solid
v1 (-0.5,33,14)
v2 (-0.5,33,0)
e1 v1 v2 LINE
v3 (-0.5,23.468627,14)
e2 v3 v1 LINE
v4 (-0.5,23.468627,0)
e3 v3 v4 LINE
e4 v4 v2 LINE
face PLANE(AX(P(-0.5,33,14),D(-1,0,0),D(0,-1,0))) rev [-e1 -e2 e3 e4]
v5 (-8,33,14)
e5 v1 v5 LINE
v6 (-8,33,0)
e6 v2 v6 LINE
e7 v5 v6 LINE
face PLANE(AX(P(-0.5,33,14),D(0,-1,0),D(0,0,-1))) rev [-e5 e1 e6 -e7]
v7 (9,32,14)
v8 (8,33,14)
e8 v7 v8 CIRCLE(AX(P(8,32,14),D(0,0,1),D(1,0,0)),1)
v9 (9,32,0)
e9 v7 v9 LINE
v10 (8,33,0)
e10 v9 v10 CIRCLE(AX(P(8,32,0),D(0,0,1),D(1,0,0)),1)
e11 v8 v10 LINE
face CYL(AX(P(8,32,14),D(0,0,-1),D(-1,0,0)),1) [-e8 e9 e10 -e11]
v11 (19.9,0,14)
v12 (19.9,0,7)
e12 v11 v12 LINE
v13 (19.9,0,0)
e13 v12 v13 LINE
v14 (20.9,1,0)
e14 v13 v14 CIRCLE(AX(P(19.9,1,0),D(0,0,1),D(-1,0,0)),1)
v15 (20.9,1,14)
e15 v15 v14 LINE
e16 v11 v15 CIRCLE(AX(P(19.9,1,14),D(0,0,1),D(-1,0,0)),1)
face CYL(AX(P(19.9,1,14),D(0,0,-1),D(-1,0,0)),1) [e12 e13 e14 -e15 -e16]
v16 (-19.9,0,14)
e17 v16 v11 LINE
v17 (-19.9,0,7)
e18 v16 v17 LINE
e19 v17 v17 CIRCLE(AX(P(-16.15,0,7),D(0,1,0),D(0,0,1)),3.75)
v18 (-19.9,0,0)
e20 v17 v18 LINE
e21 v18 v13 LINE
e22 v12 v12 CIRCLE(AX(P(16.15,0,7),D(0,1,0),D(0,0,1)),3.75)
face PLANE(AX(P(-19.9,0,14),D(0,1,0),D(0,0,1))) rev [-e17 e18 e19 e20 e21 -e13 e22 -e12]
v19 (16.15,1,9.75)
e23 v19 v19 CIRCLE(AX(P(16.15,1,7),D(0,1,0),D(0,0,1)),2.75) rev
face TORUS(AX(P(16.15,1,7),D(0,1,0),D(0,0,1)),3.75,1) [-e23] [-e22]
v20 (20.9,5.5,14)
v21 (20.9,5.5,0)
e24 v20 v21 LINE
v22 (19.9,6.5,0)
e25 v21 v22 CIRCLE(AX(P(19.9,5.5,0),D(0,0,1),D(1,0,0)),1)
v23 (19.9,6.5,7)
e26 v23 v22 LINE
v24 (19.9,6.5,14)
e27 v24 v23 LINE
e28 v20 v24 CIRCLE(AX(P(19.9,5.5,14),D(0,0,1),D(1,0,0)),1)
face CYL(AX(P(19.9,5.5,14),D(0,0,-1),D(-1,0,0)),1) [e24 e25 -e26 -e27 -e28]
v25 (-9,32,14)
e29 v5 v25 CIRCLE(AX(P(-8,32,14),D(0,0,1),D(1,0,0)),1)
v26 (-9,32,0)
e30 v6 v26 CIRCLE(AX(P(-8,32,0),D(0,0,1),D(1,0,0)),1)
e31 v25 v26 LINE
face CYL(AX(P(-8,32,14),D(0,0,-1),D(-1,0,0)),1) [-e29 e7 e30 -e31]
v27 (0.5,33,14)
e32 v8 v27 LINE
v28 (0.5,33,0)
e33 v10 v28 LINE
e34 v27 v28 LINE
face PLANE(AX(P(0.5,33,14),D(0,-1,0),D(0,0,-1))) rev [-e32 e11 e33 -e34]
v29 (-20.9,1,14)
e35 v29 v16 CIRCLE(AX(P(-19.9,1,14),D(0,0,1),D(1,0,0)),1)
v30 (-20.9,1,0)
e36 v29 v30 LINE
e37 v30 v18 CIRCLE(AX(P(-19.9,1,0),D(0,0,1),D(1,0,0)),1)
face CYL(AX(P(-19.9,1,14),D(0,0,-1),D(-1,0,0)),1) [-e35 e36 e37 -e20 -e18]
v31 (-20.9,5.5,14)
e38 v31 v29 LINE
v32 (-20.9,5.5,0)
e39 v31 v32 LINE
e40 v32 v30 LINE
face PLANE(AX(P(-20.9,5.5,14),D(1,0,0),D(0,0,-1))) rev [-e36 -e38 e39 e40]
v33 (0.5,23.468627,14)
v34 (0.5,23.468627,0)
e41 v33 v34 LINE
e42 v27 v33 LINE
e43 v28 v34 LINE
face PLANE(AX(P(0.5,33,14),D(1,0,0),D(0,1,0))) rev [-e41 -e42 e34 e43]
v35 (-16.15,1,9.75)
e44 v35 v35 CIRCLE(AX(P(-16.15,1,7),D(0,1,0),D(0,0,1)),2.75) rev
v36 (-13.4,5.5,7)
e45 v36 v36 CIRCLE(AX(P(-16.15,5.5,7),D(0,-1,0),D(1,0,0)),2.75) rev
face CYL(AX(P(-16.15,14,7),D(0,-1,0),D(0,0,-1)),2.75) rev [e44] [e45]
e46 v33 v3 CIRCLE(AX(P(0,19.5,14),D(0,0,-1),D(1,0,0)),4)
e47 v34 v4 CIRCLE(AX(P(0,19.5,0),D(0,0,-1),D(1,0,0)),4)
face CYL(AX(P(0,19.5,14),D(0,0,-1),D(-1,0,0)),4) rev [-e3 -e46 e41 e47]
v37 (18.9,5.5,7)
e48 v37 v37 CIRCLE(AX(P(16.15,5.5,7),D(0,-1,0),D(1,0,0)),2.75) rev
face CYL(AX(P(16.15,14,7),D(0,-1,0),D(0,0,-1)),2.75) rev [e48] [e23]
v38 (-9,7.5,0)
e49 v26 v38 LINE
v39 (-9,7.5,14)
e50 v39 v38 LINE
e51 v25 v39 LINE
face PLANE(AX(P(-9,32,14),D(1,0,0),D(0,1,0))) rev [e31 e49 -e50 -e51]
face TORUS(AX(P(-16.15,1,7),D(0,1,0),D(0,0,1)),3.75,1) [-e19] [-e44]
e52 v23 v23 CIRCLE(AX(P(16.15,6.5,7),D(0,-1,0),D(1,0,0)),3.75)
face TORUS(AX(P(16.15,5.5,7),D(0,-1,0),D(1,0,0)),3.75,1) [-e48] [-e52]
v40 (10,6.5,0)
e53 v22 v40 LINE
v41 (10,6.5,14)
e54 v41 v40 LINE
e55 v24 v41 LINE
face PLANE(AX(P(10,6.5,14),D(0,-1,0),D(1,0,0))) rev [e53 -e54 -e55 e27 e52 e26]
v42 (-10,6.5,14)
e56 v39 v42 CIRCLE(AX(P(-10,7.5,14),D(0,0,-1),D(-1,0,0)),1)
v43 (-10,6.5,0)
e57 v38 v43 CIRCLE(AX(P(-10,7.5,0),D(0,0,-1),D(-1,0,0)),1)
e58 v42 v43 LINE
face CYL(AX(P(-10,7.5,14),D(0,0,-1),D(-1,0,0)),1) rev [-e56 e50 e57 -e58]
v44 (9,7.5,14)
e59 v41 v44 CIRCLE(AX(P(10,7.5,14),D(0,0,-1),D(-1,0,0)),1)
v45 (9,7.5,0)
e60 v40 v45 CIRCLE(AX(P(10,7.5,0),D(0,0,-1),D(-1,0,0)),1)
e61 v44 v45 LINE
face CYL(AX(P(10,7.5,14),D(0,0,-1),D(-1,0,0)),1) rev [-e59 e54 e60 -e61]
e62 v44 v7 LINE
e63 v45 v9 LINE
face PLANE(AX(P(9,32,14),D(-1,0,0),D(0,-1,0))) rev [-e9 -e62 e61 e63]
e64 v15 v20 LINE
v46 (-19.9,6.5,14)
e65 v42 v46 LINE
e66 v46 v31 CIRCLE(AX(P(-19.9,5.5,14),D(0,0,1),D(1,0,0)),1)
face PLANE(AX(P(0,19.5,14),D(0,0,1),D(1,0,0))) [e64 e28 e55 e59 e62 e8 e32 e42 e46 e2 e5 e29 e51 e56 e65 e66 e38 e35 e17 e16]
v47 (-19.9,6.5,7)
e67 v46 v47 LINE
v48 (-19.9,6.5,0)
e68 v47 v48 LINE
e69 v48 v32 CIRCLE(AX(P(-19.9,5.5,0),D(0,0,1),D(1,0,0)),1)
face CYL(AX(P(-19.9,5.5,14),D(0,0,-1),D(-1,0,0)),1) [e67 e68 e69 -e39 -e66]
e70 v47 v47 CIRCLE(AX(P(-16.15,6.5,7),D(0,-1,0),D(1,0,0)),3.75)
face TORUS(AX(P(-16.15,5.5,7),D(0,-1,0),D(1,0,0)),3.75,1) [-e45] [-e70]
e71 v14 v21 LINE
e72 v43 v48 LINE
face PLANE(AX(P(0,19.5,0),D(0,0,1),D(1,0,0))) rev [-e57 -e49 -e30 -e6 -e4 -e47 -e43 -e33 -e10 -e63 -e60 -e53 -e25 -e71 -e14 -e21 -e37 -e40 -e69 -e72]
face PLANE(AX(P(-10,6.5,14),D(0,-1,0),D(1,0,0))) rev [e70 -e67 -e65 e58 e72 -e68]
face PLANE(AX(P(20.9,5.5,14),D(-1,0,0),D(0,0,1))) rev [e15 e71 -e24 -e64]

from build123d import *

# Parameters (mm, degrees)
EXTRUDE_1_DEPTH     = 14
SKETCH_2_R          = 2.75
CUT_EXTRUDE_1_DEPTH = 14
FILLET_1_R          = 1


with BuildPart() as part:
    # 草图1 → 凸台-拉伸1 (new body)
    with BuildSketch(Plane.XY):
        with BuildLine():
            Line((-0.5, 33), (-8, 33))
            ThreePointArc((-8, 33), (-8.707106781, 32.707106781), (-9, 32))
            Line((-9, 32), (-9, 7.5))
            ThreePointArc((-9, 7.5), (-9.292893219, 6.792893219), (-10, 6.5))
            Line((-10, 6.5), (-19.9, 6.5))
            ThreePointArc((-19.9, 6.5), (-20.607106781, 6.207106781), (-20.9, 5.5))
            Line((-20.9, 5.5), (-20.9, 1))
            ThreePointArc((-20.9, 1), (-20.607106781, 0.292893219), (-19.9, 0))
            Line((-19.9, 0), (19.9, 0))
            ThreePointArc((19.9, 0), (20.607106781, 0.292893219), (20.9, 1))
            Line((20.9, 1), (20.9, 5.5))
            ThreePointArc((20.9, 5.5), (20.607106781, 6.207106781), (19.9, 6.5))
            Line((19.9, 6.5), (10, 6.5))
            ThreePointArc((10, 6.5), (9.292893219, 6.792893219), (9, 7.5))
            Line((9, 7.5), (9, 32))
            ThreePointArc((9, 32), (8.707106781, 32.707106781), (8, 33))
            Line((8, 33), (0.5, 33))
            Line((0.5, 33), (0.5, 23.468626967))
            ThreePointArc((0.5, 23.468626967), (0, 15.5), (-0.5, 23.468626967))
            Line((-0.5, 23.468626967), (-0.5, 33))
        make_face()
    extrude(amount=EXTRUDE_1_DEPTH)

    # 草图2 → 切除-拉伸1 (cut)
    with BuildSketch(Plane(origin=(0, 0, 0), x_dir=(1, 0, 0), z_dir=(0, 1, 0))):
        with Locations((16.15, -7)):
            Circle(SKETCH_2_R)
        with Locations(Location((-16.15, -7, 0), (0, 0, 90))):
            Circle(SKETCH_2_R)
    extrude(amount=CUT_EXTRUDE_1_DEPTH, mode=Mode.SUBTRACT)

    # 圆角1
    fillet_1_edges = [part.edges().sort_by_distance(p)[0] for p in [
        (13.4, 0, 7),
        (13.4, 6.5, 7),
        (-16.15, 0, 9.75),
        (-16.15, 6.5, 9.75),
    ]]
    fillet(fillet_1_edges, radius=FILLET_1_R - 0.0001)  # a hair under: the kernel refuses the full size


solid = part.part
